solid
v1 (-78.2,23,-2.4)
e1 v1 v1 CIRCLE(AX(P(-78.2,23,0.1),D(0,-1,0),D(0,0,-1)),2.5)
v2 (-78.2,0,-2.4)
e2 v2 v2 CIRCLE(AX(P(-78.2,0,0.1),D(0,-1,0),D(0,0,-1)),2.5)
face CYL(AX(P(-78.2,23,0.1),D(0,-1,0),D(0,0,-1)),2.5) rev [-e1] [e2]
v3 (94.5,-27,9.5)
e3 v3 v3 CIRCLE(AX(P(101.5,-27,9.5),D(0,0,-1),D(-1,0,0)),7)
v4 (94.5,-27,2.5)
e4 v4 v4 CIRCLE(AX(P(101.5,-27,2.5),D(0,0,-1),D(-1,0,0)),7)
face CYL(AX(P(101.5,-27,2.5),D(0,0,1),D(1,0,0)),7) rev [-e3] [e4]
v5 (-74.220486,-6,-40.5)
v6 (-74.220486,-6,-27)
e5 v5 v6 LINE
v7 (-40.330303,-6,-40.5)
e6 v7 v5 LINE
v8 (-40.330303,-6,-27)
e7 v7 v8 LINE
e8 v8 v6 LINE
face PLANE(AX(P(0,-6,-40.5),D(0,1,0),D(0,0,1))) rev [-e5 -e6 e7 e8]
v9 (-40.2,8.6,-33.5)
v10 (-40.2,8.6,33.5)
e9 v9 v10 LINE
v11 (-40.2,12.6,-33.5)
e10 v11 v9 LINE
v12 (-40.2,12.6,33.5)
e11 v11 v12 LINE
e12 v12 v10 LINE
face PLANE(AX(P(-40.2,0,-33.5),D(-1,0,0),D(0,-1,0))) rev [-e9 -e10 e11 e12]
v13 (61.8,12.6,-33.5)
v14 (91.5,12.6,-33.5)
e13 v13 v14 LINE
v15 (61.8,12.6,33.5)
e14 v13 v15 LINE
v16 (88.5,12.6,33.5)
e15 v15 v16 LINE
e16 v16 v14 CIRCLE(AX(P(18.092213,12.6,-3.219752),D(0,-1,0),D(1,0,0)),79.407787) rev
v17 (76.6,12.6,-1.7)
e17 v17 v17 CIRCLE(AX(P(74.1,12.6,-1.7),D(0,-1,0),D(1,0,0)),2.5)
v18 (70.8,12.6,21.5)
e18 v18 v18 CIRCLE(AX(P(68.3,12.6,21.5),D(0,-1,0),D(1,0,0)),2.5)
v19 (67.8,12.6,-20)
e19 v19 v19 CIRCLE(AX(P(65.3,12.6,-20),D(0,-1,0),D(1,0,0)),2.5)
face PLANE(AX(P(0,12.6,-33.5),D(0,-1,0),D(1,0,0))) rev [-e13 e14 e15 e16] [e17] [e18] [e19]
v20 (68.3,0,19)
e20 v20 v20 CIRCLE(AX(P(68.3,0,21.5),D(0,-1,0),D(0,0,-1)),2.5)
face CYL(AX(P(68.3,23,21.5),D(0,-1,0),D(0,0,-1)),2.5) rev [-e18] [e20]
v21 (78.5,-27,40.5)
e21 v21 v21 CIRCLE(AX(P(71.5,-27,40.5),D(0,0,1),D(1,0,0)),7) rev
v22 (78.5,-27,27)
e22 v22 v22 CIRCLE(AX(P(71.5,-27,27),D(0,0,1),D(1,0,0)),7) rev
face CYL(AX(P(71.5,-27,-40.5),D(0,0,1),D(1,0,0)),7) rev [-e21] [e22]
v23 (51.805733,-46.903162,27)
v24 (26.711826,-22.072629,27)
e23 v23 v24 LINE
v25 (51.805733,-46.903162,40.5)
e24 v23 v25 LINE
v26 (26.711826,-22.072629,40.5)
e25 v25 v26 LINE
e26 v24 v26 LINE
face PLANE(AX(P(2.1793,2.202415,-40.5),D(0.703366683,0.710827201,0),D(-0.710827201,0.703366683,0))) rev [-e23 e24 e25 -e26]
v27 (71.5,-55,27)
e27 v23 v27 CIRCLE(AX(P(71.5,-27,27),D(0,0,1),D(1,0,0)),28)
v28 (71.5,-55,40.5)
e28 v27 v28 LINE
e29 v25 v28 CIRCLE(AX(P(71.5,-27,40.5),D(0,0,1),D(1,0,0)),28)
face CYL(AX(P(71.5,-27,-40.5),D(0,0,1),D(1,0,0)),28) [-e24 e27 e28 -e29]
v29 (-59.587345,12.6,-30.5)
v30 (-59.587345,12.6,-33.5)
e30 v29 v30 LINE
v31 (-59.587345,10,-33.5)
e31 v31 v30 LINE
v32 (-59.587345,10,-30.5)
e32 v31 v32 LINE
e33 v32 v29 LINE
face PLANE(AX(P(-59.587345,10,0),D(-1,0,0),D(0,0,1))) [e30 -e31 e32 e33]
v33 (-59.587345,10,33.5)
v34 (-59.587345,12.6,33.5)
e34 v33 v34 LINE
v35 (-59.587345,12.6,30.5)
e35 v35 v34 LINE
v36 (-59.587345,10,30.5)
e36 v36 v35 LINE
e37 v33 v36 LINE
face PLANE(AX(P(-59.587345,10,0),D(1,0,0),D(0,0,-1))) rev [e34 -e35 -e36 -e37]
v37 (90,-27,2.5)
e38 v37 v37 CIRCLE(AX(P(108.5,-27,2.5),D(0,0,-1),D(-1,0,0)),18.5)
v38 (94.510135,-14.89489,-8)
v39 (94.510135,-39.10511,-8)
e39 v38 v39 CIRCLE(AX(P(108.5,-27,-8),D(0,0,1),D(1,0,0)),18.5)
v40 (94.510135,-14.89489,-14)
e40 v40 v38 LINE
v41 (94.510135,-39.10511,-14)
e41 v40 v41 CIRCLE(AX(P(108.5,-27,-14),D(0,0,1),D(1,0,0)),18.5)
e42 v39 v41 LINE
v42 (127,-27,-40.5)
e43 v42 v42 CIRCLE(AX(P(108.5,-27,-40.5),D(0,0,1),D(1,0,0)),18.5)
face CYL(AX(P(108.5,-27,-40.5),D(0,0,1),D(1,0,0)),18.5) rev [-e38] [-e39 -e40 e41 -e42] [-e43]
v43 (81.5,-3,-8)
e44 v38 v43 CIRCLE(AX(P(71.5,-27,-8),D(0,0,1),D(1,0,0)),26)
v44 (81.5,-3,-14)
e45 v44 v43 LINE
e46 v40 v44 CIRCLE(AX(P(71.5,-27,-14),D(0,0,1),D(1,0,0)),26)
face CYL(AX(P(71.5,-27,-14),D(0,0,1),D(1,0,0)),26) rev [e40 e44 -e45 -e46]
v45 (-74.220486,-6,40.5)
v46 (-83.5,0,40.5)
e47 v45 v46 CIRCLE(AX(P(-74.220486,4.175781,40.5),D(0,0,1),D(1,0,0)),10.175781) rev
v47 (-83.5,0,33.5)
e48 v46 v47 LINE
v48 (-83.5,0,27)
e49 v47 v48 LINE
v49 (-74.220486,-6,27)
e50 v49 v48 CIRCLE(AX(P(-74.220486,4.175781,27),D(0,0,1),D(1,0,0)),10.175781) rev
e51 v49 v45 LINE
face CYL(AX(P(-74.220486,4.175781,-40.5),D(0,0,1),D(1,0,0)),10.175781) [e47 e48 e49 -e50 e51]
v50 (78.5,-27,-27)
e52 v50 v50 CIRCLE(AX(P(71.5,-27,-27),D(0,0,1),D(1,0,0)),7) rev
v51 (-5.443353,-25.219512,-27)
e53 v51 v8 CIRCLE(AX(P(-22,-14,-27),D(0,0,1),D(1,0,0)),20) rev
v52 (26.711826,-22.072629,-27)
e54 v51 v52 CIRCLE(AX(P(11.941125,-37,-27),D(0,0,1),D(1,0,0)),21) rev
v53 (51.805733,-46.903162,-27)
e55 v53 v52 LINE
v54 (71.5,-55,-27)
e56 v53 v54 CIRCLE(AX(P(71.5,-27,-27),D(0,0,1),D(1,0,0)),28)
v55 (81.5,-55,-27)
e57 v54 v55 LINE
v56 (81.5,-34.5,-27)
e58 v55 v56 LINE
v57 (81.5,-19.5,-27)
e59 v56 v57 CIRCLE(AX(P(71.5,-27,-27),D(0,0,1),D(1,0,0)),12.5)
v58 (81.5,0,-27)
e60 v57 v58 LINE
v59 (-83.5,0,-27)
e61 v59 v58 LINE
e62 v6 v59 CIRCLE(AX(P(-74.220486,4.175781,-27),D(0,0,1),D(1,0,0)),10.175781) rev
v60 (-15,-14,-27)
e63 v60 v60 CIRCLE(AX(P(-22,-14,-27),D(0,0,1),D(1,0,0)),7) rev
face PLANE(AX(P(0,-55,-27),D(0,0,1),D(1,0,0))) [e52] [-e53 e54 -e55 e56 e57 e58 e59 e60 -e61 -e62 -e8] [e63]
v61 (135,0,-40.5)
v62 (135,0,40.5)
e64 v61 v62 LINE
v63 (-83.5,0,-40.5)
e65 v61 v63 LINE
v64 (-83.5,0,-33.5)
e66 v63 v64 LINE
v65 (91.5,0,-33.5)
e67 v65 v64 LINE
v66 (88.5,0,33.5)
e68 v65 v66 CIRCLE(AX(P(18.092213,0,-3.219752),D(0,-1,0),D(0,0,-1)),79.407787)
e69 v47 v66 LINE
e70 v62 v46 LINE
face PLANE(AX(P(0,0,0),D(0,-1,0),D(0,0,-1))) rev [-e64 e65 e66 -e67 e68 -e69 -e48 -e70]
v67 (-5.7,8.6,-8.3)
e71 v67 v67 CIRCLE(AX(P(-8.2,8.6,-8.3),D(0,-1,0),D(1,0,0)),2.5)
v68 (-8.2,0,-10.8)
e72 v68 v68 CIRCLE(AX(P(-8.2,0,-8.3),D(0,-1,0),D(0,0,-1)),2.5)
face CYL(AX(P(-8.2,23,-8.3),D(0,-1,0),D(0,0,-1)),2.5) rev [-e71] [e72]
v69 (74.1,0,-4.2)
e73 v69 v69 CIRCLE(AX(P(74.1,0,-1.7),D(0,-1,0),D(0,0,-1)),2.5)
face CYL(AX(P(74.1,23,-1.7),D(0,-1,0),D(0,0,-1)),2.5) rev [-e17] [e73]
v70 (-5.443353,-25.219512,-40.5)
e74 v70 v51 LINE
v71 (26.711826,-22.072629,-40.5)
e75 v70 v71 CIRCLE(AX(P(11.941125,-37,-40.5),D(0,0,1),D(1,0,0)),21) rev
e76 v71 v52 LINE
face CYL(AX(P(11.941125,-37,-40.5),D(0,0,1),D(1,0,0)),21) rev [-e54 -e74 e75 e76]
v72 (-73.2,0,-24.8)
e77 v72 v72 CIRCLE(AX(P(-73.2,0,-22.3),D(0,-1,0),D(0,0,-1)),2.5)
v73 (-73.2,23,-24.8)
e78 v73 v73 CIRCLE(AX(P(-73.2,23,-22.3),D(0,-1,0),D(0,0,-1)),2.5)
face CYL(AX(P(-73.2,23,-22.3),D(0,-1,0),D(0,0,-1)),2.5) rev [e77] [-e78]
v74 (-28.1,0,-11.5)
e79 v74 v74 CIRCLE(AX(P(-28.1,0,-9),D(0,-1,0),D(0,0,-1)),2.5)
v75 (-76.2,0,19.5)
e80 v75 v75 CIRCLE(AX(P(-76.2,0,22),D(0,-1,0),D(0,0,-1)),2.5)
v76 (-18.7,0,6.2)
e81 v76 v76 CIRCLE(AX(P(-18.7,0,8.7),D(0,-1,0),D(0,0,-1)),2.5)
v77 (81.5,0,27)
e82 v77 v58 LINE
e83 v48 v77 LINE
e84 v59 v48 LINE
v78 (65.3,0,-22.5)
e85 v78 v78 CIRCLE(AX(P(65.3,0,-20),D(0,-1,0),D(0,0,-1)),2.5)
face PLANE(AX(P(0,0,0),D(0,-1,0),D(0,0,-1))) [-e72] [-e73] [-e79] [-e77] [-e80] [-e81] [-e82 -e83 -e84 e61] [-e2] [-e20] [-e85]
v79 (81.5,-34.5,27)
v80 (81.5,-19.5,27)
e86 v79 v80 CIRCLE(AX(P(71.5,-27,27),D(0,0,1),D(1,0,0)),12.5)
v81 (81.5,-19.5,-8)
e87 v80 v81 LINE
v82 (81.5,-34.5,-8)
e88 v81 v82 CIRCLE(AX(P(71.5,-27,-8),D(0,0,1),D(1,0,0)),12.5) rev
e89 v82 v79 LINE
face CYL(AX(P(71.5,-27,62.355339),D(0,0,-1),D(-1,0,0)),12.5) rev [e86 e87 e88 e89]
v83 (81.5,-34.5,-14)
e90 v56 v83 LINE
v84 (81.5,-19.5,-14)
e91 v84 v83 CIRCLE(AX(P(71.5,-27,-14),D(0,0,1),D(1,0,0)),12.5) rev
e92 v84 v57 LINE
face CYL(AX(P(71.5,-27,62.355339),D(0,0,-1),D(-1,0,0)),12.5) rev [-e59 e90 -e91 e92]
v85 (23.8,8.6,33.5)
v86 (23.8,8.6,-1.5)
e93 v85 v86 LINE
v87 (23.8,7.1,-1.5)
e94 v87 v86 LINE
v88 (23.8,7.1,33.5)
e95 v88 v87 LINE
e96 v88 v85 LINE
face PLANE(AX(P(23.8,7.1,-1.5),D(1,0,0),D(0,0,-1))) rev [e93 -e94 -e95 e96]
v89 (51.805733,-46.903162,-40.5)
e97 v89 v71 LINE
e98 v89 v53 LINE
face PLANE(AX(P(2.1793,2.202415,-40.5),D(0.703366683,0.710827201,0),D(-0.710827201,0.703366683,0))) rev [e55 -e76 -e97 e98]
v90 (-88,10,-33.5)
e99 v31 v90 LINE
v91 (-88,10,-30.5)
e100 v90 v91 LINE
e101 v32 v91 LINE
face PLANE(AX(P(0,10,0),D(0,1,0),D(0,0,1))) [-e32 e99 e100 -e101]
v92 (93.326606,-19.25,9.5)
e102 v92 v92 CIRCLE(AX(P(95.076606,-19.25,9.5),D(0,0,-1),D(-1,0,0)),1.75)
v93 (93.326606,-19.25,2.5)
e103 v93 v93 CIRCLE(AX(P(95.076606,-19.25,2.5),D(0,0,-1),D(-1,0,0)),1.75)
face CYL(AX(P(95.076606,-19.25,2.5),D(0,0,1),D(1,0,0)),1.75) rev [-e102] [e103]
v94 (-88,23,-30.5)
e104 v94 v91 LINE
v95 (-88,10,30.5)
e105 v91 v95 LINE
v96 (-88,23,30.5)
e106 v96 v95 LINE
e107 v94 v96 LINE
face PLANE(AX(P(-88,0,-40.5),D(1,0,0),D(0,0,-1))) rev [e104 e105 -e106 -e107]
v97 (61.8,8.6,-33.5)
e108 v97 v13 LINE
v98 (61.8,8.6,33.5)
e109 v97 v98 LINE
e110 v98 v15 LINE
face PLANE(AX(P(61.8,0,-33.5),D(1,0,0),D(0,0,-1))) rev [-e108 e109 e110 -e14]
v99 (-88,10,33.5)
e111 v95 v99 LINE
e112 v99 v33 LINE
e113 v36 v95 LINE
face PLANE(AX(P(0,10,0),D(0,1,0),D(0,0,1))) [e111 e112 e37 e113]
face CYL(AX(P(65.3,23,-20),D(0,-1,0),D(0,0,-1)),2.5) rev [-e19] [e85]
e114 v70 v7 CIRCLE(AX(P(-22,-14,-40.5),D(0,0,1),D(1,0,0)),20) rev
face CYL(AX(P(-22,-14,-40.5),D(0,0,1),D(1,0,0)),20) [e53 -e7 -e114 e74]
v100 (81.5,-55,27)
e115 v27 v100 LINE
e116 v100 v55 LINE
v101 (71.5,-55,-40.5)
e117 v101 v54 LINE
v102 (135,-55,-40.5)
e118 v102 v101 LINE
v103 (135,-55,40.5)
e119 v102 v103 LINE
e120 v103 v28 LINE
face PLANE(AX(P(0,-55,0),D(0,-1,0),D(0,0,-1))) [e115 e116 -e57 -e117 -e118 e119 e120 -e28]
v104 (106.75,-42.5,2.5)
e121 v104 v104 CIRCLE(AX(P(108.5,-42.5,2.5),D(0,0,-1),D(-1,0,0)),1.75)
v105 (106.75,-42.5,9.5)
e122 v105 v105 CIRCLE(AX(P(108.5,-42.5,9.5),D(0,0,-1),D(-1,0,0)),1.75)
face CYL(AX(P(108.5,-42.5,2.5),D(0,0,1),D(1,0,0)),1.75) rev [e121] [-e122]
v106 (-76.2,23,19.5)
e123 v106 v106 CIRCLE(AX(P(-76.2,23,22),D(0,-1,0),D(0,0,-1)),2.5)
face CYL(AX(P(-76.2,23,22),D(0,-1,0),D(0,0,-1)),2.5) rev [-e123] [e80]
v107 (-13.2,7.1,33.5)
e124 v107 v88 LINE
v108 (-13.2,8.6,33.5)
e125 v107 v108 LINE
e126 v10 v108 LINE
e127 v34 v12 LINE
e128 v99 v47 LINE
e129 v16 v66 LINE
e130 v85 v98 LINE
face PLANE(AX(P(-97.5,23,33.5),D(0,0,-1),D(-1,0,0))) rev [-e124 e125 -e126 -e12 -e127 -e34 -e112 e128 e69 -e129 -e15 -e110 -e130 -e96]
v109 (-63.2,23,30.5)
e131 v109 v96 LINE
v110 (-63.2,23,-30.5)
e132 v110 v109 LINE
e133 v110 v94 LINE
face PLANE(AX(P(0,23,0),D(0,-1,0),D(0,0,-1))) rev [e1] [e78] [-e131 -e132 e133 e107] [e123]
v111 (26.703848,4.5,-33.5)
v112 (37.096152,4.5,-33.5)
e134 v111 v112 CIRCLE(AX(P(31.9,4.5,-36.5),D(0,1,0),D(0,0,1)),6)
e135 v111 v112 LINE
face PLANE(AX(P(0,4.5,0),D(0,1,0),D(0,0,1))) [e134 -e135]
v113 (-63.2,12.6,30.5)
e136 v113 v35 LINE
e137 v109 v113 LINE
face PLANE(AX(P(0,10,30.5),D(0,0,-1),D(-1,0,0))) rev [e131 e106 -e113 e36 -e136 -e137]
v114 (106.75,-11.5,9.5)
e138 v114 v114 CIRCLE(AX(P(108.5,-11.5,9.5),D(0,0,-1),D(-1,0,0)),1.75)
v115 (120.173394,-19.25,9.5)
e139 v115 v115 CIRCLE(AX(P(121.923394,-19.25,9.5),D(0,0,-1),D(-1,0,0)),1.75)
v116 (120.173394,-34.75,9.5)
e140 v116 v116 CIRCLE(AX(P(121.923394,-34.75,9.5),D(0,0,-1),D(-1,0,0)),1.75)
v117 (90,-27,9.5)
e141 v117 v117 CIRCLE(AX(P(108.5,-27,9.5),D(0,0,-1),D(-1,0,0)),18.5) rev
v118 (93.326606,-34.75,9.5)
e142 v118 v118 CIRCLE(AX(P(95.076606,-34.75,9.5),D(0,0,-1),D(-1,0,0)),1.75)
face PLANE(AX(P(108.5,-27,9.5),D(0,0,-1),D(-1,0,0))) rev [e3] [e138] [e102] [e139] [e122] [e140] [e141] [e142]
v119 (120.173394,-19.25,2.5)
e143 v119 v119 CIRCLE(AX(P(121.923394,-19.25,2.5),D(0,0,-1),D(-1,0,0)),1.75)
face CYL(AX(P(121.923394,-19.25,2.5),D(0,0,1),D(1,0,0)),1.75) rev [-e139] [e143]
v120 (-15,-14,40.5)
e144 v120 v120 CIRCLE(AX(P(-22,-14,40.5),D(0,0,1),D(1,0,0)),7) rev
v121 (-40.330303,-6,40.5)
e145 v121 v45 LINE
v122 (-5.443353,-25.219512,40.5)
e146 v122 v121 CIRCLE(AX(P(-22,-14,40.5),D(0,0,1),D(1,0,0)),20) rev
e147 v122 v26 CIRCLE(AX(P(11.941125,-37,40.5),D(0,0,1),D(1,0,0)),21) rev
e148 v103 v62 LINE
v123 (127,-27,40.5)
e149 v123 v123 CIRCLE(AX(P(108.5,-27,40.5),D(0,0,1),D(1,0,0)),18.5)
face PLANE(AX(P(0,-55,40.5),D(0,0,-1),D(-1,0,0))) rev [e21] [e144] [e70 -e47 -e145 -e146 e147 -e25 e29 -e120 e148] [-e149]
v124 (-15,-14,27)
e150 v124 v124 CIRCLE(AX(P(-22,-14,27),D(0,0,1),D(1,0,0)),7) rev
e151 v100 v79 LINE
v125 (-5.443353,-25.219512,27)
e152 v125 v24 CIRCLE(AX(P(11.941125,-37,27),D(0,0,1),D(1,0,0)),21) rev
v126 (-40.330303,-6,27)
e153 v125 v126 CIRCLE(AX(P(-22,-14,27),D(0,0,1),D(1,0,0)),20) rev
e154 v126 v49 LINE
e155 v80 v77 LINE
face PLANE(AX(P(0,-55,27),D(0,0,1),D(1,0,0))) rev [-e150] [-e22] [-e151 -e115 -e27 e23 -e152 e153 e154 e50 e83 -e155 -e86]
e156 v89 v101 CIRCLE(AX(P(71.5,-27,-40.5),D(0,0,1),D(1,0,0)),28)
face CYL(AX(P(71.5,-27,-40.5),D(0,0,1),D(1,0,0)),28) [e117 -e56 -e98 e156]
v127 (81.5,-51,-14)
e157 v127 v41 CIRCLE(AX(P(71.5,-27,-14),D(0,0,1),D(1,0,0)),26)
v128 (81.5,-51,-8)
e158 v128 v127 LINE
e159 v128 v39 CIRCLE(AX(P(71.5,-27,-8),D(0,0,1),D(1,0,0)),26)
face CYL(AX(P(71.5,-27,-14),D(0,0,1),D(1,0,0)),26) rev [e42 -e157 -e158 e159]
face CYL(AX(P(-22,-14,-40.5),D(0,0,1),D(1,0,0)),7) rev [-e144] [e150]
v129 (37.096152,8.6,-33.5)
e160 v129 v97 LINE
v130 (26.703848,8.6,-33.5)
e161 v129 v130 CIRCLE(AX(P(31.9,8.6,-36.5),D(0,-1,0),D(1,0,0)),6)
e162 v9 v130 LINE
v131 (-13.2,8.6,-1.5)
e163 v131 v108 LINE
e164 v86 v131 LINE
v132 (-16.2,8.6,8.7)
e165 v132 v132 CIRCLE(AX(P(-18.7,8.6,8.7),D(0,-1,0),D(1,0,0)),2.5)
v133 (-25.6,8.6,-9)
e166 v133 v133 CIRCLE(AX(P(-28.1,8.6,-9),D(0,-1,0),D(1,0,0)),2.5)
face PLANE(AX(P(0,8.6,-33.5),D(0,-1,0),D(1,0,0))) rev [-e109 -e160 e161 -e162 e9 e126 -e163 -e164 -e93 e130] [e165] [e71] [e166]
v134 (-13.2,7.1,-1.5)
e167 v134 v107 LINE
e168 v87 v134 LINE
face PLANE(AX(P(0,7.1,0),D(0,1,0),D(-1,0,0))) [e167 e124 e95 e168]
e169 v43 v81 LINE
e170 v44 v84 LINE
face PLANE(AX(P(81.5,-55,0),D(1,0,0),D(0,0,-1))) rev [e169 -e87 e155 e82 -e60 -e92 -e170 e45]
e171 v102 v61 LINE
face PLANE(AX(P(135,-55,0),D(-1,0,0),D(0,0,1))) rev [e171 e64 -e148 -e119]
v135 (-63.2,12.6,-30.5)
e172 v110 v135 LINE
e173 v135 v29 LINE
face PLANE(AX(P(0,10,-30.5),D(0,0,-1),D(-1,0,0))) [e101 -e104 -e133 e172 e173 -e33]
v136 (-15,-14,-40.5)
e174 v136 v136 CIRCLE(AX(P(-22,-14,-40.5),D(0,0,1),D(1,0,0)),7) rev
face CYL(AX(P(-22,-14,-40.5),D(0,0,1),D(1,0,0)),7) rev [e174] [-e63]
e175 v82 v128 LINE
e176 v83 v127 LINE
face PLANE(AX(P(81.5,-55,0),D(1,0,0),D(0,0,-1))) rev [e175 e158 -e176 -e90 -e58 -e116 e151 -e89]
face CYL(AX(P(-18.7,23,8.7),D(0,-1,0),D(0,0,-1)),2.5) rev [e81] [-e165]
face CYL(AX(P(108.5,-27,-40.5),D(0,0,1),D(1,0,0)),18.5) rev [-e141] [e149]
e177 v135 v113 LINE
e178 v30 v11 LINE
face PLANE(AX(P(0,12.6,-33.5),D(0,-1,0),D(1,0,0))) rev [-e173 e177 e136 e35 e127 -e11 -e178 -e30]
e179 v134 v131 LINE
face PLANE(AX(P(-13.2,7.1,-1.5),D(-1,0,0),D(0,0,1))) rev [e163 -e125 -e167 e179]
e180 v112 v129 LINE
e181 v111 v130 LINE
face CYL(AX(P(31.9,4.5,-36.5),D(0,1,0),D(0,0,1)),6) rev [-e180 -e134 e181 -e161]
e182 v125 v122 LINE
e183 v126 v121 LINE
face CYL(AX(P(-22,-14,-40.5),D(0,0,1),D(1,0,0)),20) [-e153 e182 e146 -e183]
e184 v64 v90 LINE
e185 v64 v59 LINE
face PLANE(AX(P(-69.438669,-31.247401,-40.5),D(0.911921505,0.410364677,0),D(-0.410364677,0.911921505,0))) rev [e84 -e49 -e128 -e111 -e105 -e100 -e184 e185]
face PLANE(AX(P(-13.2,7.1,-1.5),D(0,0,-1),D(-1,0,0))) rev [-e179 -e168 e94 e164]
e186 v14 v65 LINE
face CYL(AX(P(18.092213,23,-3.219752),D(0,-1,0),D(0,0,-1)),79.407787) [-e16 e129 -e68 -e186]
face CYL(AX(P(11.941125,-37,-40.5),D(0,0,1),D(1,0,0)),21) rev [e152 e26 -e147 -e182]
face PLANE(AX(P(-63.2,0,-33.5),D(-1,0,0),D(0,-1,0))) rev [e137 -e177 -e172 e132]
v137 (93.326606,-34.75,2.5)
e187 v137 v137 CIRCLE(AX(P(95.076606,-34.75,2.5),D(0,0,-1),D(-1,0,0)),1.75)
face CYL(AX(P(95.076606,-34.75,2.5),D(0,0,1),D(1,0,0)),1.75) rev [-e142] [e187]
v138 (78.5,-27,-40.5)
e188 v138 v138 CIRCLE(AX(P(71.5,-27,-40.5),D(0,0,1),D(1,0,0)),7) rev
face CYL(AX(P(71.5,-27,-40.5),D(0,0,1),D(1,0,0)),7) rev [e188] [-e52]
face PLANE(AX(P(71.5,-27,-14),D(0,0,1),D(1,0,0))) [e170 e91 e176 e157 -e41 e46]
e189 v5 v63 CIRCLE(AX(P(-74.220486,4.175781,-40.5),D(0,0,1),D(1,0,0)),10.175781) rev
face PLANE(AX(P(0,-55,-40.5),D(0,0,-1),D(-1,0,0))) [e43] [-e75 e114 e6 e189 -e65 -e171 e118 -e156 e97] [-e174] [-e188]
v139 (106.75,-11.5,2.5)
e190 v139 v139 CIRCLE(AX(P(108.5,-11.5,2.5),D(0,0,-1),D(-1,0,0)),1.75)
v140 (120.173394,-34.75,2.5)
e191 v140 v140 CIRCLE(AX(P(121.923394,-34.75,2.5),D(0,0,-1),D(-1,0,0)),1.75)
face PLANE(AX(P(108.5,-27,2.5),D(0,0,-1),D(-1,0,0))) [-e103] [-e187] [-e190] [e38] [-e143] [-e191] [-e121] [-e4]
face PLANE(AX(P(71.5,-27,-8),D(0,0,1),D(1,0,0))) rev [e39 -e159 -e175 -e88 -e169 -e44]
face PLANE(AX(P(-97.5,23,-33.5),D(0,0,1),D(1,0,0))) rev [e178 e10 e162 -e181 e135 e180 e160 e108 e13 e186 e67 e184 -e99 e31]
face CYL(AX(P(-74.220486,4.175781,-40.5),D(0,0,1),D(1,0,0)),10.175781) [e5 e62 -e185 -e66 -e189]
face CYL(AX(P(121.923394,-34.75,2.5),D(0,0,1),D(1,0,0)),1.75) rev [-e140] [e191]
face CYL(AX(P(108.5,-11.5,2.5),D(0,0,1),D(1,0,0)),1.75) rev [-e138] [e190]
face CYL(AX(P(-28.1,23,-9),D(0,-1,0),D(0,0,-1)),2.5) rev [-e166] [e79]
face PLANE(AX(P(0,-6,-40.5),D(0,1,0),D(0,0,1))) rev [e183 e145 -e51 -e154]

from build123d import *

# Parameters (mm, degrees)
SKETCH1_W              = 195
SKETCH1_H              = 67
BOSS_EXTRUDE1_DEPTH    = 23
CUT_EXTRUDE1_DEPTH     = 106.629067969
CUT_EXTRUDE2_DEPTH     = 121.516596367
CUT_EXTRUDE3_START     = -13
SKETCH4_W              = 3.612655346
SKETCH4_H              = 3
CUT_EXTRUDE3_DEPTH     = 13
SKETCH6_R              = 2.5
CUT_EXTRUDE4_DEPTH     = 106.629067969
SKETCH7_W              = 37
SKETCH7_H              = 35
CUT_EXTRUDE5_DEPTH     = 1.5
CUT_EXTRUDE6_DEPTH     = 18.5
BOSS_EXTRUDE2_DEPTH    = 55
CUT_EXTRUDE7_OUTLINE_R = 7
CUT_EXTRUDE7_DEPTH     = 81
CUT_EXTRUDE8_START     = -8
SKETCH11_R             = 26
CUT_EXTRUDE8_DEPTH     = 6
SKETCH12_R             = 18.5
CUT_EXTRUDE9_DEPTH     = 167.766303551
SKETCH13_R             = 12.5
CUT_EXTRUDE10_DEPTH    = 54
BOSS_EXTRUDE3_START    = -50
SKETCH14_R             = 18.5
SKETCH14_R_2           = 1.75
SKETCH14_R_3           = 7
BOSS_EXTRUDE3_DEPTH    = 7


# Read off the part's stored shape, not the designer's step: Cut-Extrude7
with BuildPart() as part:
    # Sketch1 → Boss-Extrude1 (new body)
    with BuildSketch(Plane(origin=(0, 0, 0), x_dir=(1, 0, 0), z_dir=(0, 1, 0))):
        Rectangle(SKETCH1_W, SKETCH1_H)
    extrude(amount=BOSS_EXTRUDE1_DEPTH)

    # Sketch2 → Cut-Extrude1 (cut, through all)
    with BuildSketch(Plane.XZ):
        with BuildLine():
            Line((97.5, -3.219751644), (97.5, 33.5))
            Line((97.5, 33.5), (88.5, 33.5))
            ThreePointArc((88.5, 33.5), (95.217186872, 15.683556008), (97.5, -3.219751644))
        make_face()
        with BuildLine():
            Line((97.5, -33.5), (97.5, -3.219751644))
            ThreePointArc((97.5, -3.219751644), (95.985558513, -18.65423771), (91.5, -33.5))
            Line((91.5, -33.5), (97.5, -33.5))
        make_face()
        with BuildLine():
            ThreePointArc((-88, -33.5), (-95.08607052, -15.861694529), (-97.5, 2.992884749))
            Line((-97.5, 2.992884749), (-97.5, -33.5))
            Line((-97.5, -33.5), (-88, -33.5))
        make_face()
        with BuildLine():
            ThreePointArc((-97.5, 2.992884749), (-95.856964648, 18.588830376), (-91, 33.5))
            Line((-91, 33.5), (-97.5, 33.5))
            Line((-97.5, 33.5), (-97.5, 2.992884749))
        make_face()
    extrude(amount=-CUT_EXTRUDE1_DEPTH, mode=Mode.SUBTRACT)

    # Sketch3 → Cut-Extrude2 (cut, through all)
    with BuildSketch(Plane(origin=(0, 0, 33.5), x_dir=(-1, 0, 0), z_dir=(0, 0, -1))):
        Polygon((63.2, 23), (63.2, 12.6), (40.2, 12.6), (40.2, 8.6), (-61.8, 8.6), (-61.8, 12.6), (-97.5, 12.6), (-97.5, 23), align=None)
    extrude(amount=CUT_EXTRUDE2_DEPTH, mode=Mode.SUBTRACT)

    # Sketch4 → Cut-Extrude3 (cut)
    with BuildSketch(Plane(origin=(0, 23, 0), x_dir=(1, 0, 0), z_dir=(0, 1, 0)).offset(CUT_EXTRUDE3_START)):
        with BuildLine():
            Line((-63.2, 30.5), (-63.2, 33.5))
            Line((-63.2, 33.5), (-88, 33.5))
            ThreePointArc((-88, 33.5), (-88.810680862, 32.008999469), (-89.587344654, 30.5))
            Line((-89.587344654, 30.5), (-63.2, 30.5))
        make_face()
        with Locations((-61.393672327, 32)):
            Rectangle(SKETCH4_W, SKETCH4_H)
        with BuildLine():
            Line((-63.2, -33.5), (-63.2, -30.5))
            Line((-63.2, -30.5), (-92.261692194, -30.5))
            ThreePointArc((-92.261692194, -30.5), (-91.647155152, -32.006859002), (-91, -33.5))
            Line((-91, -33.5), (-63.2, -33.5))
        make_face()
        with Locations((-61.393672327, -32)):
            Rectangle(SKETCH4_W, SKETCH4_H)
    extrude(amount=CUT_EXTRUDE3_DEPTH, mode=Mode.SUBTRACT)

    # Sketch6 → Cut-Extrude4 (cut, through all)
    with BuildSketch(Plane.XZ):
        with Locations(Location((-28.1, -9, 0), (0, 0, 270))):
            Circle(SKETCH6_R)
        with Locations(Location((-8.2, -8.3, 0), (0, 0, 270))):
            Circle(SKETCH6_R)
        with Locations(Location((-18.7, 8.7, 0), (0, 0, 270))):
            Circle(SKETCH6_R)
        with Locations(Location((-76.2, 22, 0), (0, 0, 270))):
            Circle(SKETCH6_R)
        with Locations(Location((-78.2, 0.1, 0), (0, 0, 270))):
            Circle(SKETCH6_R)
        with Locations(Location((-73.2, -22.3, 0), (0, 0, 270))):
            Circle(SKETCH6_R)
        with Locations(Location((65.3, -20, 0), (0, 0, 270))):
            Circle(SKETCH6_R)
        with Locations(Location((74.1, -1.7, 0), (0, 0, 270))):
            Circle(SKETCH6_R)
        with Locations(Location((68.3, 21.5, 0), (0, 0, 270))):
            Circle(SKETCH6_R)
    extrude(amount=-CUT_EXTRUDE4_DEPTH, mode=Mode.SUBTRACT)

    # Sketch7 → Cut-Extrude5 (cut)
    with BuildSketch(Plane(origin=(0, 8.6, 0), x_dir=(1, 0, 0), z_dir=(0, 1, 0))):
        with Locations((5.3, -16)):
            Rectangle(SKETCH7_W, SKETCH7_H)
    extrude(amount=-CUT_EXTRUDE5_DEPTH, mode=Mode.SUBTRACT)

    # Sketch8 → Cut-Extrude6 (cut)
    with BuildSketch(Plane(origin=(0, 23, 0), x_dir=(1, 0, 0), z_dir=(0, 1, 0))):
        with BuildLine():
            Line((37.096152423, 33.5), (31.9, 33.5))
            Line((31.9, 33.5), (31.9, 30.5))
            ThreePointArc((31.9, 30.5), (34.9, 31.303847577), (37.096152423, 33.5))
        make_face()
        with BuildLine():
            Line((31.9, 33.5), (26.703847577, 33.5))
            ThreePointArc((26.703847577, 33.5), (28.9, 31.303847577), (31.9, 30.5))
            Line((31.9, 30.5), (31.9, 33.5))
        make_face()
    extrude(amount=-CUT_EXTRUDE6_DEPTH, mode=Mode.SUBTRACT)

    # Sketch9 → Boss-Extrude2 (add)
    with BuildSketch(Plane.XZ):
        Polygon((-83.5, -27), (-83.5, -40.5), (135, -40.5), (135, 40.5), (-83.5, 40.5), (-83.5, 27), (81.5, 27), (81.5, 0), (81.5, -27), align=None)
    extrude(amount=BOSS_EXTRUDE2_DEPTH)

    # Cut-Extrude7 outline → Cut-Extrude7 (cut)
    with BuildSketch(Plane(origin=(-0.000736395, 0, 40.5), x_dir=(-1, 0, 0), z_dir=(0, 0, -1))):
        with BuildLine():
            Line((83.499263605, -55), (83.499263605, 0))
            ThreePointArc((83.499263605, 0), (79.744905458, -4.369344862), (74.219749945, -6))
            Line((74.219749945, -6), (40.329566384, -6))
            ThreePointArc((40.329566384, -6), (31.649853034, -31.517594688), (5.442617021, -25.219512195))
            ThreePointArc((5.442617021, -25.219512195), (-9.896457675, -16.099848766), (-26.712562231, -22.072628782))
            Line((-26.712562231, -22.072628782), (-51.806469277, -46.903161625))
            ThreePointArc((-51.806469277, -46.903161625), (-60.853871258, -52.896800241), (-71.500736395, -55))
            Line((-71.500736395, -55), (83.499263605, -55))
        make_face()
        Polygon((87.999263605, 10), (83.499263605, 0), (97.499263605, 0), (97.499263605, 23), (87.999263605, 23), align=None)
        with Locations((-71.500736395, -27)):
            Circle(CUT_EXTRUDE7_OUTLINE_R)
        with Locations((21.999263605, -14)):
            Circle(CUT_EXTRUDE7_OUTLINE_R)
    extrude(amount=CUT_EXTRUDE7_DEPTH, mode=Mode.SUBTRACT)

    # Sketch11 → Cut-Extrude8 (cut)
    with BuildSketch(Plane.XY.offset(CUT_EXTRUDE8_START)):
        with Locations((71.5, -27)):
            Circle(SKETCH11_R)
    extrude(amount=-CUT_EXTRUDE8_DEPTH, mode=Mode.SUBTRACT)

    # Sketch12 → Cut-Extrude9 (cut, through all)
    with BuildSketch(Plane.XY.offset(40.5)):
        with Locations((108.5, -27)):
            Circle(SKETCH12_R)
    extrude(amount=-CUT_EXTRUDE9_DEPTH, mode=Mode.SUBTRACT)

    # Sketch13 → Cut-Extrude10 (cut)
    with BuildSketch(Plane.XY.offset(-27)):
        with Locations((71.5, -27)):
            Circle(SKETCH13_R)
    extrude(amount=CUT_EXTRUDE10_DEPTH, mode=Mode.SUBTRACT)

    # Sketch14 → Boss-Extrude3 (add)
    with BuildSketch(Plane(origin=(0, 0, -40.5), x_dir=(-1, 0, 0), z_dir=(0, 0, -1)).offset(BOSS_EXTRUDE3_START)):
        with Locations(Location((-108.5, -27, 0), (0, 0, 180))):
            Circle(SKETCH14_R)
        with Locations((-108.5, -11.5)):
            Circle(SKETCH14_R_2, mode=Mode.SUBTRACT)
        with Locations((-95.076606241, -19.25)):
            Circle(SKETCH14_R_2, mode=Mode.SUBTRACT)
        with Locations((-95.076606241, -34.75)):
            Circle(SKETCH14_R_2, mode=Mode.SUBTRACT)
        with Locations((-108.5, -42.5)):
            Circle(SKETCH14_R_2, mode=Mode.SUBTRACT)
        with Locations((-121.923393759, -34.75)):
            Circle(SKETCH14_R_2, mode=Mode.SUBTRACT)
        with Locations((-121.923393759, -19.25)):
            Circle(SKETCH14_R_2, mode=Mode.SUBTRACT)
        with Locations((-101.5, -27)):
            Circle(SKETCH14_R_3, mode=Mode.SUBTRACT)
    extrude(amount=BOSS_EXTRUDE3_DEPTH)


solid = part.part
